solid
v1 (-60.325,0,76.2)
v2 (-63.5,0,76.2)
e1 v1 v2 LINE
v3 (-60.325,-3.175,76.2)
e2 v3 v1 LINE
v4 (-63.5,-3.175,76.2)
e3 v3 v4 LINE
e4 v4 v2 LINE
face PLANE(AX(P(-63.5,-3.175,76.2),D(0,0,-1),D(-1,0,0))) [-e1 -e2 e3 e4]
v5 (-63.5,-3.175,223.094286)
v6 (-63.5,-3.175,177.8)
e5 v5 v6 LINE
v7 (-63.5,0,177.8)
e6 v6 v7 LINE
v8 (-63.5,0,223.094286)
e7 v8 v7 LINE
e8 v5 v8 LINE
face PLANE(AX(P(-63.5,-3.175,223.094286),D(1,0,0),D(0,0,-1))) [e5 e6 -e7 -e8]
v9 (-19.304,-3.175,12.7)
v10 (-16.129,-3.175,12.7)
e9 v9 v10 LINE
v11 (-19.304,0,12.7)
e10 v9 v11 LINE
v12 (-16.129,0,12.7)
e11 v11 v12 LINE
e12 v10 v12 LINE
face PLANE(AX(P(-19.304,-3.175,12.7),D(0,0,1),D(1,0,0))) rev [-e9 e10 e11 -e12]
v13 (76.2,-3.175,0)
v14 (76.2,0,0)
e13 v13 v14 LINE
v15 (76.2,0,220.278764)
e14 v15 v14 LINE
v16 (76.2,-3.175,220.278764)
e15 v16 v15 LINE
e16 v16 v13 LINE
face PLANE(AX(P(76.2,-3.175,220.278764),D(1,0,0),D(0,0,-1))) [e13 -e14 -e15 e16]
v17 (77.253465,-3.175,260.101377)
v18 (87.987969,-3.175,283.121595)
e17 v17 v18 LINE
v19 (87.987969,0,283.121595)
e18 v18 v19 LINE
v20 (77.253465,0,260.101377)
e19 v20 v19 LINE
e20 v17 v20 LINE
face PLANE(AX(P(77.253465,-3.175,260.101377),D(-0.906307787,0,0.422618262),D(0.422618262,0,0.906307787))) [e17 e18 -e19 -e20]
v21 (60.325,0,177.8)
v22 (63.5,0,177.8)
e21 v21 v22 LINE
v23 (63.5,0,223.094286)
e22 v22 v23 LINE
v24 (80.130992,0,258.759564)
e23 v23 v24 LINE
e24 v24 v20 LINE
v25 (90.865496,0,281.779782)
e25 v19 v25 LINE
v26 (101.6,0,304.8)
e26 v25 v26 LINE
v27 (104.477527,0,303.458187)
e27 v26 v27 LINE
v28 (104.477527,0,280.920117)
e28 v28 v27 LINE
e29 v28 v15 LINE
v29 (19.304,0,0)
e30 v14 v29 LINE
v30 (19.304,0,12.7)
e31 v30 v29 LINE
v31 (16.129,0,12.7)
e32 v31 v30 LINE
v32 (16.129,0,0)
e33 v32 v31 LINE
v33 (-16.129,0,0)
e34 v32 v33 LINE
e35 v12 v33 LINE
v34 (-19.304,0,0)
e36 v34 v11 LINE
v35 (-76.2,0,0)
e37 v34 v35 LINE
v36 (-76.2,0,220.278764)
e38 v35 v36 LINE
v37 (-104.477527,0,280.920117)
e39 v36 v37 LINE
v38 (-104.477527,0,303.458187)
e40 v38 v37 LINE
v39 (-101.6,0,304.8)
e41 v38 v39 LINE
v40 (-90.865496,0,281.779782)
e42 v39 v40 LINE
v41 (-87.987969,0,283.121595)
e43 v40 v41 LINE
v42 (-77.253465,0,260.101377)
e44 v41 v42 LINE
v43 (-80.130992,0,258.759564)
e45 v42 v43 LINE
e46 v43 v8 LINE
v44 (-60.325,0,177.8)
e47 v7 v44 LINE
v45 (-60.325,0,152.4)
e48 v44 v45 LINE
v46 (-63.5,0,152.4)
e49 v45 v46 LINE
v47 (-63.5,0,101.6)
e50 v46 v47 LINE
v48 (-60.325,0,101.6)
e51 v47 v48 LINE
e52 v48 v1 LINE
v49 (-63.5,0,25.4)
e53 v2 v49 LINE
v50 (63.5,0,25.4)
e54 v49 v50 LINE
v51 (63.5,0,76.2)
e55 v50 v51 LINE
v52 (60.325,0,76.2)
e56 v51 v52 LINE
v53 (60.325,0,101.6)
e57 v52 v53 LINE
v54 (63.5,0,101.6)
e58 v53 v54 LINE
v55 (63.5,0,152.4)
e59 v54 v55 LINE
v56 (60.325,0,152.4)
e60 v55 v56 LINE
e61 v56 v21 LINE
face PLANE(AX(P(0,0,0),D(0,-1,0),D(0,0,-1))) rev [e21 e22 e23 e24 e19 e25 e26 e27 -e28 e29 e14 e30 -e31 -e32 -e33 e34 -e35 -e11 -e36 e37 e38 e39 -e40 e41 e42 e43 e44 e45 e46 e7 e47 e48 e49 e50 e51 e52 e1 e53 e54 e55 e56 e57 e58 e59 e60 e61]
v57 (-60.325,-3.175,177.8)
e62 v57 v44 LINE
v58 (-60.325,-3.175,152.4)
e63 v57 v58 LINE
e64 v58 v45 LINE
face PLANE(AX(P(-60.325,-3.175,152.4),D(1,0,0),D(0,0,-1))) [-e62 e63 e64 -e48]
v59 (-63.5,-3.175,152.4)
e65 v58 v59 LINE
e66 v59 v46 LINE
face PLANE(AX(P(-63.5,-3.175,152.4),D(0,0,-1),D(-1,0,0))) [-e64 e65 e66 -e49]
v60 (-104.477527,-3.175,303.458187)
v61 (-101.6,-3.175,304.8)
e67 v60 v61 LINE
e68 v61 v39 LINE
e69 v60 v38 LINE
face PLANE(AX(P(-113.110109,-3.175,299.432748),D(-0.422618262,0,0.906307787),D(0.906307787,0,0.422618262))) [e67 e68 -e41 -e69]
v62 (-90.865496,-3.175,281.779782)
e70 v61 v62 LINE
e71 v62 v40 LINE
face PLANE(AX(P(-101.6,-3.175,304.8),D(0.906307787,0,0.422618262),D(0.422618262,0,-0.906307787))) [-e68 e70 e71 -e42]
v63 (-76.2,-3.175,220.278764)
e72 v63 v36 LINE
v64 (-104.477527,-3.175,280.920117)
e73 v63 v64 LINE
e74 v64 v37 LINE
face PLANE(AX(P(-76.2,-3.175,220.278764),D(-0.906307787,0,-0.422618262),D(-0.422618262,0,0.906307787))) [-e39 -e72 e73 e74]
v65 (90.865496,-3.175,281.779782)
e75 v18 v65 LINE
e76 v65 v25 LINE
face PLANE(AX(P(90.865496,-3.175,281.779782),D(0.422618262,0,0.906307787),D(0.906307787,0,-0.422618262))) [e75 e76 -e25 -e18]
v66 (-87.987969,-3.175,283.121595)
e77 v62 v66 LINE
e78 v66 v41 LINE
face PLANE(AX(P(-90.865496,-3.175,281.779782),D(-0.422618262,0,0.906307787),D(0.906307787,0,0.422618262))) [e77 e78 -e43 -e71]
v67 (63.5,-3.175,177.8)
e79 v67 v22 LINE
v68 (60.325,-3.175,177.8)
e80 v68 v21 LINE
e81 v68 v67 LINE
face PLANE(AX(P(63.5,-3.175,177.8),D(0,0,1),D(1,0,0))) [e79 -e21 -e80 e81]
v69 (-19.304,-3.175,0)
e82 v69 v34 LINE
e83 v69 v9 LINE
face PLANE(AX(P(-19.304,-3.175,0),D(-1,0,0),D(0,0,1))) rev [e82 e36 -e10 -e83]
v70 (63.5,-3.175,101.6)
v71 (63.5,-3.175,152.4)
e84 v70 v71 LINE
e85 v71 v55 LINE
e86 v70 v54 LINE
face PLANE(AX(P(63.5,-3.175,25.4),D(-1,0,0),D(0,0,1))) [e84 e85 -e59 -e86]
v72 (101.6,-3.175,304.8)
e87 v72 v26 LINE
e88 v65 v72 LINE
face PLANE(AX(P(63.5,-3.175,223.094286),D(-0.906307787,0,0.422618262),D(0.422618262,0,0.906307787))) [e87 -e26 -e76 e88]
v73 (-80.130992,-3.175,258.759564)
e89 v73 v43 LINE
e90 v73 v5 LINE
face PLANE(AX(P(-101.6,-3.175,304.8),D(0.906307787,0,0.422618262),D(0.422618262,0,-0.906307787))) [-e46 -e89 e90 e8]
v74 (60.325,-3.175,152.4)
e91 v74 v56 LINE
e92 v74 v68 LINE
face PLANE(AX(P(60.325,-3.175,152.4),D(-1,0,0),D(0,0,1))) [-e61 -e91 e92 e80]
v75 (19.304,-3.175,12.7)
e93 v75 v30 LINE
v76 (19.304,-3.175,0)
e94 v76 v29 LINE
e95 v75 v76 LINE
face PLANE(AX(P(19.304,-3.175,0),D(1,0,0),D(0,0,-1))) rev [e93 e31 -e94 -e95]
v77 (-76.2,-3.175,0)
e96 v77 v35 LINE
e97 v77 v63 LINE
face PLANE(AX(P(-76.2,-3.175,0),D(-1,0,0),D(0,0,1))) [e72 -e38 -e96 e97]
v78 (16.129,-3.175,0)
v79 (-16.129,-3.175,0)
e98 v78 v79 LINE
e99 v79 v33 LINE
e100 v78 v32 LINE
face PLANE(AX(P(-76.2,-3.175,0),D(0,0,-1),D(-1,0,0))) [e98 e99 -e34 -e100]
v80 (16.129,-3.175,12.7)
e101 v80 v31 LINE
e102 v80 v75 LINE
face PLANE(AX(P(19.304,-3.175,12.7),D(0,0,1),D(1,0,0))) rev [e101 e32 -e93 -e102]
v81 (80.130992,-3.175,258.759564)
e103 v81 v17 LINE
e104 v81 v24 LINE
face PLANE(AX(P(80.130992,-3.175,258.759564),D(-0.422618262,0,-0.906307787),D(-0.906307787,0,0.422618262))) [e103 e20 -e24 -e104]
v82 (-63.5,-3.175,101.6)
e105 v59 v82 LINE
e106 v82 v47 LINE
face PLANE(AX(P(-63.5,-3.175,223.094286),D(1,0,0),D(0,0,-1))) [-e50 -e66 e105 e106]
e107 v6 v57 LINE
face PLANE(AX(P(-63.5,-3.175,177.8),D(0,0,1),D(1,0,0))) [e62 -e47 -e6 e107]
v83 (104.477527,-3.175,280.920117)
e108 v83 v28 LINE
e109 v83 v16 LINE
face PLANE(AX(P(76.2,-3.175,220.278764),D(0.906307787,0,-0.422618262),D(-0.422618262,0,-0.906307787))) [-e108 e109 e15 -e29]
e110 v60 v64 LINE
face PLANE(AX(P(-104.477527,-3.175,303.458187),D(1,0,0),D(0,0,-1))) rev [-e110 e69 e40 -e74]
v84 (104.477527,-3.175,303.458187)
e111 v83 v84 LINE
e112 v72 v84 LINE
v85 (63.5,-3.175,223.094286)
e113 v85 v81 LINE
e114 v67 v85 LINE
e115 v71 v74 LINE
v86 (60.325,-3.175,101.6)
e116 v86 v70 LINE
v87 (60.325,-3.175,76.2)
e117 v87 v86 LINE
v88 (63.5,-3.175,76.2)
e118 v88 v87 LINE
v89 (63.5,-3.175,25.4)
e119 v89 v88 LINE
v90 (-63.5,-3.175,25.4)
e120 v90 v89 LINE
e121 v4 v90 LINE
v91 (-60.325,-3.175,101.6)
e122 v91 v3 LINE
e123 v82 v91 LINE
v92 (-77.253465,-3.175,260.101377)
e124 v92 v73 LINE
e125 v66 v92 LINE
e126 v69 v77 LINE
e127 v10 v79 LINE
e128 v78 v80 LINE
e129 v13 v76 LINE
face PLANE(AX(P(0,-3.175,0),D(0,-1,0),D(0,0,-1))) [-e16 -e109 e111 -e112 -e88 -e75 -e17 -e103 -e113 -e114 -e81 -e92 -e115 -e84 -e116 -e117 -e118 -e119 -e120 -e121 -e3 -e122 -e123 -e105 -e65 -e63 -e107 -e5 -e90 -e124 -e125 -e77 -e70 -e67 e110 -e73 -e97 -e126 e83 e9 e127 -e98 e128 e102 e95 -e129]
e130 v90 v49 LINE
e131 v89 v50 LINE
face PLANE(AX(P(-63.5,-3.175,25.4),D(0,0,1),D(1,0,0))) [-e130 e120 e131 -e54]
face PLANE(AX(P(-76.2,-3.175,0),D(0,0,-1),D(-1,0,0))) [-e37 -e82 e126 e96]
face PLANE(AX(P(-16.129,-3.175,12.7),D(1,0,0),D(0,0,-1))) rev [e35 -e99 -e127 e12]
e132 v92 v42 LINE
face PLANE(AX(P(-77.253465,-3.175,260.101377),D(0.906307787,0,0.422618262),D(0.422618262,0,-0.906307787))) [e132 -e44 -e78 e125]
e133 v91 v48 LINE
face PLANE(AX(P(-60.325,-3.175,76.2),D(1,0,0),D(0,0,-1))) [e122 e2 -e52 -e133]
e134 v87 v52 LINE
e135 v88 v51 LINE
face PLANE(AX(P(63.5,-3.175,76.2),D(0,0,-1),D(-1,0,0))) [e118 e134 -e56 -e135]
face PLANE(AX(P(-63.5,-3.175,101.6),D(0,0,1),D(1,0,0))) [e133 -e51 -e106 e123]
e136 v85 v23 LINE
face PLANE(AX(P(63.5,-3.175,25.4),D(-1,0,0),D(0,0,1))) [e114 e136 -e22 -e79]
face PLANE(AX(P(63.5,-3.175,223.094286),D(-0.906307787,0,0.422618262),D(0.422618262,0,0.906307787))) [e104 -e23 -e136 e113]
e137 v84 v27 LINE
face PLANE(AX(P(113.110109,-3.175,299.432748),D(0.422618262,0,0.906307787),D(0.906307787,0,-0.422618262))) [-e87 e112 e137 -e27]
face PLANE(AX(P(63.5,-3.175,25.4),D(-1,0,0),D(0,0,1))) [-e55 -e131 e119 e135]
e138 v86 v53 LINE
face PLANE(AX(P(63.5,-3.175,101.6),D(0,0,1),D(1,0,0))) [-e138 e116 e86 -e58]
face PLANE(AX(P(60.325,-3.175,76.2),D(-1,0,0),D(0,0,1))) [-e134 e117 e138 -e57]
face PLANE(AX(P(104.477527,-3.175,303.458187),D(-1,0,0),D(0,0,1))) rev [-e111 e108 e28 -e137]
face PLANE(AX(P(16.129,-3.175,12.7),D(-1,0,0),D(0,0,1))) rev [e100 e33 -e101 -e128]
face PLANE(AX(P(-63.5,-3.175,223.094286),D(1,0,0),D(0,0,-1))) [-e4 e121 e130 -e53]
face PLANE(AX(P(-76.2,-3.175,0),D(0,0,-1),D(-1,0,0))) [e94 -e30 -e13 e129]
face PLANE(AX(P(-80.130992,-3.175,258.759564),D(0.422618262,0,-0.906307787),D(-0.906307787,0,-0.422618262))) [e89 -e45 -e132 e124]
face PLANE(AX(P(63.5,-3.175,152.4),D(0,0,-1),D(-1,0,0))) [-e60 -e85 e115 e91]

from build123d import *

# Parameters (mm, degrees)
BASE_FLANGE1_DEPTH = 3.175
SKETCH7_W          = 3.175
SKETCH7_H          = 12.7
CUT_EXTRUDE1_DEPTH = 326.126156068
SKETCH12_W         = 3.175
SKETCH12_H         = 25.4
TAB1_DEPTH         = 3.175
CUT_EXTRUDE2_DEPTH = 326.126156068


# Sheet-metal steps are written as plain solids
with BuildPart() as part:
    # Sketch1 → Base-Flange1 (new body)
    with BuildSketch(Plane(origin=(0, 0, 0), x_dir=(1, 0, 0), z_dir=(0, 1, 0))):
        Polygon((-76.2, 0), (76.2, 0), (76.2, -220.278764113), (113.110108895, -299.432748076), (101.6, -304.8), (63.5, -223.094286329), (63.5, -25.4), (-63.5, -25.4), (-63.5, -223.094286329), (-101.6, -304.8), (-113.110108895, -299.432748076), (-76.2, -220.278764113), align=None)
    extrude(amount=-BASE_FLANGE1_DEPTH)

    # Sketch7 → Cut-Extrude1 (cut, through all)
    with BuildSketch(Plane(origin=(0, 0, 0), x_dir=(1, 0, 0), z_dir=(0, 1, 0))):
        with Locations((-17.7165, -6.35)):
            Rectangle(SKETCH7_W, SKETCH7_H)
        with Locations((17.7165, -6.35)):
            Rectangle(SKETCH7_W, SKETCH7_H)
    extrude(amount=-CUT_EXTRUDE1_DEPTH, mode=Mode.SUBTRACT)

    # Sketch12 → Tab1 (add)
    with BuildSketch(Plane(origin=(0, 0, 0), x_dir=(1, 0, 0), z_dir=(0, 1, 0))):
        with Locations((-61.9125, -88.9)):
            Rectangle(SKETCH12_W, SKETCH12_H)
        Polygon((-80.130992304, -258.759564419), (-90.865496152, -281.779782209), (-87.987968928, -283.12159519), (-77.25346508, -260.1013774), align=None)
        with Locations((-61.9125, -165.1)):
            Rectangle(SKETCH12_W, SKETCH12_H)
        Polygon((77.25346508, -260.1013774), (87.987968928, -283.12159519), (90.865496152, -281.779782209), (80.130992304, -258.759564419), align=None)
        with Locations((61.9125, -165.1)):
            Rectangle(SKETCH12_W, SKETCH12_H)
        with Locations((61.9125, -88.9)):
            Rectangle(SKETCH12_W, SKETCH12_H)
    extrude(amount=-TAB1_DEPTH)

    # Sketch13 → Cut-Extrude2 (cut, through all)
    with BuildSketch(Plane(origin=(0, 0, 0), x_dir=(1, 0, 0), z_dir=(0, 1, 0))):
        Polygon((-104.477527224, -303.458187019), (-104.477527224, -280.920116939), (-113.110108895, -299.432748076), align=None)
        Polygon((104.477527224, -303.458187019), (104.477527224, -280.920116939), (113.110108895, -299.432748076), align=None)
    extrude(amount=-CUT_EXTRUDE2_DEPTH, mode=Mode.SUBTRACT)


solid = part.part
